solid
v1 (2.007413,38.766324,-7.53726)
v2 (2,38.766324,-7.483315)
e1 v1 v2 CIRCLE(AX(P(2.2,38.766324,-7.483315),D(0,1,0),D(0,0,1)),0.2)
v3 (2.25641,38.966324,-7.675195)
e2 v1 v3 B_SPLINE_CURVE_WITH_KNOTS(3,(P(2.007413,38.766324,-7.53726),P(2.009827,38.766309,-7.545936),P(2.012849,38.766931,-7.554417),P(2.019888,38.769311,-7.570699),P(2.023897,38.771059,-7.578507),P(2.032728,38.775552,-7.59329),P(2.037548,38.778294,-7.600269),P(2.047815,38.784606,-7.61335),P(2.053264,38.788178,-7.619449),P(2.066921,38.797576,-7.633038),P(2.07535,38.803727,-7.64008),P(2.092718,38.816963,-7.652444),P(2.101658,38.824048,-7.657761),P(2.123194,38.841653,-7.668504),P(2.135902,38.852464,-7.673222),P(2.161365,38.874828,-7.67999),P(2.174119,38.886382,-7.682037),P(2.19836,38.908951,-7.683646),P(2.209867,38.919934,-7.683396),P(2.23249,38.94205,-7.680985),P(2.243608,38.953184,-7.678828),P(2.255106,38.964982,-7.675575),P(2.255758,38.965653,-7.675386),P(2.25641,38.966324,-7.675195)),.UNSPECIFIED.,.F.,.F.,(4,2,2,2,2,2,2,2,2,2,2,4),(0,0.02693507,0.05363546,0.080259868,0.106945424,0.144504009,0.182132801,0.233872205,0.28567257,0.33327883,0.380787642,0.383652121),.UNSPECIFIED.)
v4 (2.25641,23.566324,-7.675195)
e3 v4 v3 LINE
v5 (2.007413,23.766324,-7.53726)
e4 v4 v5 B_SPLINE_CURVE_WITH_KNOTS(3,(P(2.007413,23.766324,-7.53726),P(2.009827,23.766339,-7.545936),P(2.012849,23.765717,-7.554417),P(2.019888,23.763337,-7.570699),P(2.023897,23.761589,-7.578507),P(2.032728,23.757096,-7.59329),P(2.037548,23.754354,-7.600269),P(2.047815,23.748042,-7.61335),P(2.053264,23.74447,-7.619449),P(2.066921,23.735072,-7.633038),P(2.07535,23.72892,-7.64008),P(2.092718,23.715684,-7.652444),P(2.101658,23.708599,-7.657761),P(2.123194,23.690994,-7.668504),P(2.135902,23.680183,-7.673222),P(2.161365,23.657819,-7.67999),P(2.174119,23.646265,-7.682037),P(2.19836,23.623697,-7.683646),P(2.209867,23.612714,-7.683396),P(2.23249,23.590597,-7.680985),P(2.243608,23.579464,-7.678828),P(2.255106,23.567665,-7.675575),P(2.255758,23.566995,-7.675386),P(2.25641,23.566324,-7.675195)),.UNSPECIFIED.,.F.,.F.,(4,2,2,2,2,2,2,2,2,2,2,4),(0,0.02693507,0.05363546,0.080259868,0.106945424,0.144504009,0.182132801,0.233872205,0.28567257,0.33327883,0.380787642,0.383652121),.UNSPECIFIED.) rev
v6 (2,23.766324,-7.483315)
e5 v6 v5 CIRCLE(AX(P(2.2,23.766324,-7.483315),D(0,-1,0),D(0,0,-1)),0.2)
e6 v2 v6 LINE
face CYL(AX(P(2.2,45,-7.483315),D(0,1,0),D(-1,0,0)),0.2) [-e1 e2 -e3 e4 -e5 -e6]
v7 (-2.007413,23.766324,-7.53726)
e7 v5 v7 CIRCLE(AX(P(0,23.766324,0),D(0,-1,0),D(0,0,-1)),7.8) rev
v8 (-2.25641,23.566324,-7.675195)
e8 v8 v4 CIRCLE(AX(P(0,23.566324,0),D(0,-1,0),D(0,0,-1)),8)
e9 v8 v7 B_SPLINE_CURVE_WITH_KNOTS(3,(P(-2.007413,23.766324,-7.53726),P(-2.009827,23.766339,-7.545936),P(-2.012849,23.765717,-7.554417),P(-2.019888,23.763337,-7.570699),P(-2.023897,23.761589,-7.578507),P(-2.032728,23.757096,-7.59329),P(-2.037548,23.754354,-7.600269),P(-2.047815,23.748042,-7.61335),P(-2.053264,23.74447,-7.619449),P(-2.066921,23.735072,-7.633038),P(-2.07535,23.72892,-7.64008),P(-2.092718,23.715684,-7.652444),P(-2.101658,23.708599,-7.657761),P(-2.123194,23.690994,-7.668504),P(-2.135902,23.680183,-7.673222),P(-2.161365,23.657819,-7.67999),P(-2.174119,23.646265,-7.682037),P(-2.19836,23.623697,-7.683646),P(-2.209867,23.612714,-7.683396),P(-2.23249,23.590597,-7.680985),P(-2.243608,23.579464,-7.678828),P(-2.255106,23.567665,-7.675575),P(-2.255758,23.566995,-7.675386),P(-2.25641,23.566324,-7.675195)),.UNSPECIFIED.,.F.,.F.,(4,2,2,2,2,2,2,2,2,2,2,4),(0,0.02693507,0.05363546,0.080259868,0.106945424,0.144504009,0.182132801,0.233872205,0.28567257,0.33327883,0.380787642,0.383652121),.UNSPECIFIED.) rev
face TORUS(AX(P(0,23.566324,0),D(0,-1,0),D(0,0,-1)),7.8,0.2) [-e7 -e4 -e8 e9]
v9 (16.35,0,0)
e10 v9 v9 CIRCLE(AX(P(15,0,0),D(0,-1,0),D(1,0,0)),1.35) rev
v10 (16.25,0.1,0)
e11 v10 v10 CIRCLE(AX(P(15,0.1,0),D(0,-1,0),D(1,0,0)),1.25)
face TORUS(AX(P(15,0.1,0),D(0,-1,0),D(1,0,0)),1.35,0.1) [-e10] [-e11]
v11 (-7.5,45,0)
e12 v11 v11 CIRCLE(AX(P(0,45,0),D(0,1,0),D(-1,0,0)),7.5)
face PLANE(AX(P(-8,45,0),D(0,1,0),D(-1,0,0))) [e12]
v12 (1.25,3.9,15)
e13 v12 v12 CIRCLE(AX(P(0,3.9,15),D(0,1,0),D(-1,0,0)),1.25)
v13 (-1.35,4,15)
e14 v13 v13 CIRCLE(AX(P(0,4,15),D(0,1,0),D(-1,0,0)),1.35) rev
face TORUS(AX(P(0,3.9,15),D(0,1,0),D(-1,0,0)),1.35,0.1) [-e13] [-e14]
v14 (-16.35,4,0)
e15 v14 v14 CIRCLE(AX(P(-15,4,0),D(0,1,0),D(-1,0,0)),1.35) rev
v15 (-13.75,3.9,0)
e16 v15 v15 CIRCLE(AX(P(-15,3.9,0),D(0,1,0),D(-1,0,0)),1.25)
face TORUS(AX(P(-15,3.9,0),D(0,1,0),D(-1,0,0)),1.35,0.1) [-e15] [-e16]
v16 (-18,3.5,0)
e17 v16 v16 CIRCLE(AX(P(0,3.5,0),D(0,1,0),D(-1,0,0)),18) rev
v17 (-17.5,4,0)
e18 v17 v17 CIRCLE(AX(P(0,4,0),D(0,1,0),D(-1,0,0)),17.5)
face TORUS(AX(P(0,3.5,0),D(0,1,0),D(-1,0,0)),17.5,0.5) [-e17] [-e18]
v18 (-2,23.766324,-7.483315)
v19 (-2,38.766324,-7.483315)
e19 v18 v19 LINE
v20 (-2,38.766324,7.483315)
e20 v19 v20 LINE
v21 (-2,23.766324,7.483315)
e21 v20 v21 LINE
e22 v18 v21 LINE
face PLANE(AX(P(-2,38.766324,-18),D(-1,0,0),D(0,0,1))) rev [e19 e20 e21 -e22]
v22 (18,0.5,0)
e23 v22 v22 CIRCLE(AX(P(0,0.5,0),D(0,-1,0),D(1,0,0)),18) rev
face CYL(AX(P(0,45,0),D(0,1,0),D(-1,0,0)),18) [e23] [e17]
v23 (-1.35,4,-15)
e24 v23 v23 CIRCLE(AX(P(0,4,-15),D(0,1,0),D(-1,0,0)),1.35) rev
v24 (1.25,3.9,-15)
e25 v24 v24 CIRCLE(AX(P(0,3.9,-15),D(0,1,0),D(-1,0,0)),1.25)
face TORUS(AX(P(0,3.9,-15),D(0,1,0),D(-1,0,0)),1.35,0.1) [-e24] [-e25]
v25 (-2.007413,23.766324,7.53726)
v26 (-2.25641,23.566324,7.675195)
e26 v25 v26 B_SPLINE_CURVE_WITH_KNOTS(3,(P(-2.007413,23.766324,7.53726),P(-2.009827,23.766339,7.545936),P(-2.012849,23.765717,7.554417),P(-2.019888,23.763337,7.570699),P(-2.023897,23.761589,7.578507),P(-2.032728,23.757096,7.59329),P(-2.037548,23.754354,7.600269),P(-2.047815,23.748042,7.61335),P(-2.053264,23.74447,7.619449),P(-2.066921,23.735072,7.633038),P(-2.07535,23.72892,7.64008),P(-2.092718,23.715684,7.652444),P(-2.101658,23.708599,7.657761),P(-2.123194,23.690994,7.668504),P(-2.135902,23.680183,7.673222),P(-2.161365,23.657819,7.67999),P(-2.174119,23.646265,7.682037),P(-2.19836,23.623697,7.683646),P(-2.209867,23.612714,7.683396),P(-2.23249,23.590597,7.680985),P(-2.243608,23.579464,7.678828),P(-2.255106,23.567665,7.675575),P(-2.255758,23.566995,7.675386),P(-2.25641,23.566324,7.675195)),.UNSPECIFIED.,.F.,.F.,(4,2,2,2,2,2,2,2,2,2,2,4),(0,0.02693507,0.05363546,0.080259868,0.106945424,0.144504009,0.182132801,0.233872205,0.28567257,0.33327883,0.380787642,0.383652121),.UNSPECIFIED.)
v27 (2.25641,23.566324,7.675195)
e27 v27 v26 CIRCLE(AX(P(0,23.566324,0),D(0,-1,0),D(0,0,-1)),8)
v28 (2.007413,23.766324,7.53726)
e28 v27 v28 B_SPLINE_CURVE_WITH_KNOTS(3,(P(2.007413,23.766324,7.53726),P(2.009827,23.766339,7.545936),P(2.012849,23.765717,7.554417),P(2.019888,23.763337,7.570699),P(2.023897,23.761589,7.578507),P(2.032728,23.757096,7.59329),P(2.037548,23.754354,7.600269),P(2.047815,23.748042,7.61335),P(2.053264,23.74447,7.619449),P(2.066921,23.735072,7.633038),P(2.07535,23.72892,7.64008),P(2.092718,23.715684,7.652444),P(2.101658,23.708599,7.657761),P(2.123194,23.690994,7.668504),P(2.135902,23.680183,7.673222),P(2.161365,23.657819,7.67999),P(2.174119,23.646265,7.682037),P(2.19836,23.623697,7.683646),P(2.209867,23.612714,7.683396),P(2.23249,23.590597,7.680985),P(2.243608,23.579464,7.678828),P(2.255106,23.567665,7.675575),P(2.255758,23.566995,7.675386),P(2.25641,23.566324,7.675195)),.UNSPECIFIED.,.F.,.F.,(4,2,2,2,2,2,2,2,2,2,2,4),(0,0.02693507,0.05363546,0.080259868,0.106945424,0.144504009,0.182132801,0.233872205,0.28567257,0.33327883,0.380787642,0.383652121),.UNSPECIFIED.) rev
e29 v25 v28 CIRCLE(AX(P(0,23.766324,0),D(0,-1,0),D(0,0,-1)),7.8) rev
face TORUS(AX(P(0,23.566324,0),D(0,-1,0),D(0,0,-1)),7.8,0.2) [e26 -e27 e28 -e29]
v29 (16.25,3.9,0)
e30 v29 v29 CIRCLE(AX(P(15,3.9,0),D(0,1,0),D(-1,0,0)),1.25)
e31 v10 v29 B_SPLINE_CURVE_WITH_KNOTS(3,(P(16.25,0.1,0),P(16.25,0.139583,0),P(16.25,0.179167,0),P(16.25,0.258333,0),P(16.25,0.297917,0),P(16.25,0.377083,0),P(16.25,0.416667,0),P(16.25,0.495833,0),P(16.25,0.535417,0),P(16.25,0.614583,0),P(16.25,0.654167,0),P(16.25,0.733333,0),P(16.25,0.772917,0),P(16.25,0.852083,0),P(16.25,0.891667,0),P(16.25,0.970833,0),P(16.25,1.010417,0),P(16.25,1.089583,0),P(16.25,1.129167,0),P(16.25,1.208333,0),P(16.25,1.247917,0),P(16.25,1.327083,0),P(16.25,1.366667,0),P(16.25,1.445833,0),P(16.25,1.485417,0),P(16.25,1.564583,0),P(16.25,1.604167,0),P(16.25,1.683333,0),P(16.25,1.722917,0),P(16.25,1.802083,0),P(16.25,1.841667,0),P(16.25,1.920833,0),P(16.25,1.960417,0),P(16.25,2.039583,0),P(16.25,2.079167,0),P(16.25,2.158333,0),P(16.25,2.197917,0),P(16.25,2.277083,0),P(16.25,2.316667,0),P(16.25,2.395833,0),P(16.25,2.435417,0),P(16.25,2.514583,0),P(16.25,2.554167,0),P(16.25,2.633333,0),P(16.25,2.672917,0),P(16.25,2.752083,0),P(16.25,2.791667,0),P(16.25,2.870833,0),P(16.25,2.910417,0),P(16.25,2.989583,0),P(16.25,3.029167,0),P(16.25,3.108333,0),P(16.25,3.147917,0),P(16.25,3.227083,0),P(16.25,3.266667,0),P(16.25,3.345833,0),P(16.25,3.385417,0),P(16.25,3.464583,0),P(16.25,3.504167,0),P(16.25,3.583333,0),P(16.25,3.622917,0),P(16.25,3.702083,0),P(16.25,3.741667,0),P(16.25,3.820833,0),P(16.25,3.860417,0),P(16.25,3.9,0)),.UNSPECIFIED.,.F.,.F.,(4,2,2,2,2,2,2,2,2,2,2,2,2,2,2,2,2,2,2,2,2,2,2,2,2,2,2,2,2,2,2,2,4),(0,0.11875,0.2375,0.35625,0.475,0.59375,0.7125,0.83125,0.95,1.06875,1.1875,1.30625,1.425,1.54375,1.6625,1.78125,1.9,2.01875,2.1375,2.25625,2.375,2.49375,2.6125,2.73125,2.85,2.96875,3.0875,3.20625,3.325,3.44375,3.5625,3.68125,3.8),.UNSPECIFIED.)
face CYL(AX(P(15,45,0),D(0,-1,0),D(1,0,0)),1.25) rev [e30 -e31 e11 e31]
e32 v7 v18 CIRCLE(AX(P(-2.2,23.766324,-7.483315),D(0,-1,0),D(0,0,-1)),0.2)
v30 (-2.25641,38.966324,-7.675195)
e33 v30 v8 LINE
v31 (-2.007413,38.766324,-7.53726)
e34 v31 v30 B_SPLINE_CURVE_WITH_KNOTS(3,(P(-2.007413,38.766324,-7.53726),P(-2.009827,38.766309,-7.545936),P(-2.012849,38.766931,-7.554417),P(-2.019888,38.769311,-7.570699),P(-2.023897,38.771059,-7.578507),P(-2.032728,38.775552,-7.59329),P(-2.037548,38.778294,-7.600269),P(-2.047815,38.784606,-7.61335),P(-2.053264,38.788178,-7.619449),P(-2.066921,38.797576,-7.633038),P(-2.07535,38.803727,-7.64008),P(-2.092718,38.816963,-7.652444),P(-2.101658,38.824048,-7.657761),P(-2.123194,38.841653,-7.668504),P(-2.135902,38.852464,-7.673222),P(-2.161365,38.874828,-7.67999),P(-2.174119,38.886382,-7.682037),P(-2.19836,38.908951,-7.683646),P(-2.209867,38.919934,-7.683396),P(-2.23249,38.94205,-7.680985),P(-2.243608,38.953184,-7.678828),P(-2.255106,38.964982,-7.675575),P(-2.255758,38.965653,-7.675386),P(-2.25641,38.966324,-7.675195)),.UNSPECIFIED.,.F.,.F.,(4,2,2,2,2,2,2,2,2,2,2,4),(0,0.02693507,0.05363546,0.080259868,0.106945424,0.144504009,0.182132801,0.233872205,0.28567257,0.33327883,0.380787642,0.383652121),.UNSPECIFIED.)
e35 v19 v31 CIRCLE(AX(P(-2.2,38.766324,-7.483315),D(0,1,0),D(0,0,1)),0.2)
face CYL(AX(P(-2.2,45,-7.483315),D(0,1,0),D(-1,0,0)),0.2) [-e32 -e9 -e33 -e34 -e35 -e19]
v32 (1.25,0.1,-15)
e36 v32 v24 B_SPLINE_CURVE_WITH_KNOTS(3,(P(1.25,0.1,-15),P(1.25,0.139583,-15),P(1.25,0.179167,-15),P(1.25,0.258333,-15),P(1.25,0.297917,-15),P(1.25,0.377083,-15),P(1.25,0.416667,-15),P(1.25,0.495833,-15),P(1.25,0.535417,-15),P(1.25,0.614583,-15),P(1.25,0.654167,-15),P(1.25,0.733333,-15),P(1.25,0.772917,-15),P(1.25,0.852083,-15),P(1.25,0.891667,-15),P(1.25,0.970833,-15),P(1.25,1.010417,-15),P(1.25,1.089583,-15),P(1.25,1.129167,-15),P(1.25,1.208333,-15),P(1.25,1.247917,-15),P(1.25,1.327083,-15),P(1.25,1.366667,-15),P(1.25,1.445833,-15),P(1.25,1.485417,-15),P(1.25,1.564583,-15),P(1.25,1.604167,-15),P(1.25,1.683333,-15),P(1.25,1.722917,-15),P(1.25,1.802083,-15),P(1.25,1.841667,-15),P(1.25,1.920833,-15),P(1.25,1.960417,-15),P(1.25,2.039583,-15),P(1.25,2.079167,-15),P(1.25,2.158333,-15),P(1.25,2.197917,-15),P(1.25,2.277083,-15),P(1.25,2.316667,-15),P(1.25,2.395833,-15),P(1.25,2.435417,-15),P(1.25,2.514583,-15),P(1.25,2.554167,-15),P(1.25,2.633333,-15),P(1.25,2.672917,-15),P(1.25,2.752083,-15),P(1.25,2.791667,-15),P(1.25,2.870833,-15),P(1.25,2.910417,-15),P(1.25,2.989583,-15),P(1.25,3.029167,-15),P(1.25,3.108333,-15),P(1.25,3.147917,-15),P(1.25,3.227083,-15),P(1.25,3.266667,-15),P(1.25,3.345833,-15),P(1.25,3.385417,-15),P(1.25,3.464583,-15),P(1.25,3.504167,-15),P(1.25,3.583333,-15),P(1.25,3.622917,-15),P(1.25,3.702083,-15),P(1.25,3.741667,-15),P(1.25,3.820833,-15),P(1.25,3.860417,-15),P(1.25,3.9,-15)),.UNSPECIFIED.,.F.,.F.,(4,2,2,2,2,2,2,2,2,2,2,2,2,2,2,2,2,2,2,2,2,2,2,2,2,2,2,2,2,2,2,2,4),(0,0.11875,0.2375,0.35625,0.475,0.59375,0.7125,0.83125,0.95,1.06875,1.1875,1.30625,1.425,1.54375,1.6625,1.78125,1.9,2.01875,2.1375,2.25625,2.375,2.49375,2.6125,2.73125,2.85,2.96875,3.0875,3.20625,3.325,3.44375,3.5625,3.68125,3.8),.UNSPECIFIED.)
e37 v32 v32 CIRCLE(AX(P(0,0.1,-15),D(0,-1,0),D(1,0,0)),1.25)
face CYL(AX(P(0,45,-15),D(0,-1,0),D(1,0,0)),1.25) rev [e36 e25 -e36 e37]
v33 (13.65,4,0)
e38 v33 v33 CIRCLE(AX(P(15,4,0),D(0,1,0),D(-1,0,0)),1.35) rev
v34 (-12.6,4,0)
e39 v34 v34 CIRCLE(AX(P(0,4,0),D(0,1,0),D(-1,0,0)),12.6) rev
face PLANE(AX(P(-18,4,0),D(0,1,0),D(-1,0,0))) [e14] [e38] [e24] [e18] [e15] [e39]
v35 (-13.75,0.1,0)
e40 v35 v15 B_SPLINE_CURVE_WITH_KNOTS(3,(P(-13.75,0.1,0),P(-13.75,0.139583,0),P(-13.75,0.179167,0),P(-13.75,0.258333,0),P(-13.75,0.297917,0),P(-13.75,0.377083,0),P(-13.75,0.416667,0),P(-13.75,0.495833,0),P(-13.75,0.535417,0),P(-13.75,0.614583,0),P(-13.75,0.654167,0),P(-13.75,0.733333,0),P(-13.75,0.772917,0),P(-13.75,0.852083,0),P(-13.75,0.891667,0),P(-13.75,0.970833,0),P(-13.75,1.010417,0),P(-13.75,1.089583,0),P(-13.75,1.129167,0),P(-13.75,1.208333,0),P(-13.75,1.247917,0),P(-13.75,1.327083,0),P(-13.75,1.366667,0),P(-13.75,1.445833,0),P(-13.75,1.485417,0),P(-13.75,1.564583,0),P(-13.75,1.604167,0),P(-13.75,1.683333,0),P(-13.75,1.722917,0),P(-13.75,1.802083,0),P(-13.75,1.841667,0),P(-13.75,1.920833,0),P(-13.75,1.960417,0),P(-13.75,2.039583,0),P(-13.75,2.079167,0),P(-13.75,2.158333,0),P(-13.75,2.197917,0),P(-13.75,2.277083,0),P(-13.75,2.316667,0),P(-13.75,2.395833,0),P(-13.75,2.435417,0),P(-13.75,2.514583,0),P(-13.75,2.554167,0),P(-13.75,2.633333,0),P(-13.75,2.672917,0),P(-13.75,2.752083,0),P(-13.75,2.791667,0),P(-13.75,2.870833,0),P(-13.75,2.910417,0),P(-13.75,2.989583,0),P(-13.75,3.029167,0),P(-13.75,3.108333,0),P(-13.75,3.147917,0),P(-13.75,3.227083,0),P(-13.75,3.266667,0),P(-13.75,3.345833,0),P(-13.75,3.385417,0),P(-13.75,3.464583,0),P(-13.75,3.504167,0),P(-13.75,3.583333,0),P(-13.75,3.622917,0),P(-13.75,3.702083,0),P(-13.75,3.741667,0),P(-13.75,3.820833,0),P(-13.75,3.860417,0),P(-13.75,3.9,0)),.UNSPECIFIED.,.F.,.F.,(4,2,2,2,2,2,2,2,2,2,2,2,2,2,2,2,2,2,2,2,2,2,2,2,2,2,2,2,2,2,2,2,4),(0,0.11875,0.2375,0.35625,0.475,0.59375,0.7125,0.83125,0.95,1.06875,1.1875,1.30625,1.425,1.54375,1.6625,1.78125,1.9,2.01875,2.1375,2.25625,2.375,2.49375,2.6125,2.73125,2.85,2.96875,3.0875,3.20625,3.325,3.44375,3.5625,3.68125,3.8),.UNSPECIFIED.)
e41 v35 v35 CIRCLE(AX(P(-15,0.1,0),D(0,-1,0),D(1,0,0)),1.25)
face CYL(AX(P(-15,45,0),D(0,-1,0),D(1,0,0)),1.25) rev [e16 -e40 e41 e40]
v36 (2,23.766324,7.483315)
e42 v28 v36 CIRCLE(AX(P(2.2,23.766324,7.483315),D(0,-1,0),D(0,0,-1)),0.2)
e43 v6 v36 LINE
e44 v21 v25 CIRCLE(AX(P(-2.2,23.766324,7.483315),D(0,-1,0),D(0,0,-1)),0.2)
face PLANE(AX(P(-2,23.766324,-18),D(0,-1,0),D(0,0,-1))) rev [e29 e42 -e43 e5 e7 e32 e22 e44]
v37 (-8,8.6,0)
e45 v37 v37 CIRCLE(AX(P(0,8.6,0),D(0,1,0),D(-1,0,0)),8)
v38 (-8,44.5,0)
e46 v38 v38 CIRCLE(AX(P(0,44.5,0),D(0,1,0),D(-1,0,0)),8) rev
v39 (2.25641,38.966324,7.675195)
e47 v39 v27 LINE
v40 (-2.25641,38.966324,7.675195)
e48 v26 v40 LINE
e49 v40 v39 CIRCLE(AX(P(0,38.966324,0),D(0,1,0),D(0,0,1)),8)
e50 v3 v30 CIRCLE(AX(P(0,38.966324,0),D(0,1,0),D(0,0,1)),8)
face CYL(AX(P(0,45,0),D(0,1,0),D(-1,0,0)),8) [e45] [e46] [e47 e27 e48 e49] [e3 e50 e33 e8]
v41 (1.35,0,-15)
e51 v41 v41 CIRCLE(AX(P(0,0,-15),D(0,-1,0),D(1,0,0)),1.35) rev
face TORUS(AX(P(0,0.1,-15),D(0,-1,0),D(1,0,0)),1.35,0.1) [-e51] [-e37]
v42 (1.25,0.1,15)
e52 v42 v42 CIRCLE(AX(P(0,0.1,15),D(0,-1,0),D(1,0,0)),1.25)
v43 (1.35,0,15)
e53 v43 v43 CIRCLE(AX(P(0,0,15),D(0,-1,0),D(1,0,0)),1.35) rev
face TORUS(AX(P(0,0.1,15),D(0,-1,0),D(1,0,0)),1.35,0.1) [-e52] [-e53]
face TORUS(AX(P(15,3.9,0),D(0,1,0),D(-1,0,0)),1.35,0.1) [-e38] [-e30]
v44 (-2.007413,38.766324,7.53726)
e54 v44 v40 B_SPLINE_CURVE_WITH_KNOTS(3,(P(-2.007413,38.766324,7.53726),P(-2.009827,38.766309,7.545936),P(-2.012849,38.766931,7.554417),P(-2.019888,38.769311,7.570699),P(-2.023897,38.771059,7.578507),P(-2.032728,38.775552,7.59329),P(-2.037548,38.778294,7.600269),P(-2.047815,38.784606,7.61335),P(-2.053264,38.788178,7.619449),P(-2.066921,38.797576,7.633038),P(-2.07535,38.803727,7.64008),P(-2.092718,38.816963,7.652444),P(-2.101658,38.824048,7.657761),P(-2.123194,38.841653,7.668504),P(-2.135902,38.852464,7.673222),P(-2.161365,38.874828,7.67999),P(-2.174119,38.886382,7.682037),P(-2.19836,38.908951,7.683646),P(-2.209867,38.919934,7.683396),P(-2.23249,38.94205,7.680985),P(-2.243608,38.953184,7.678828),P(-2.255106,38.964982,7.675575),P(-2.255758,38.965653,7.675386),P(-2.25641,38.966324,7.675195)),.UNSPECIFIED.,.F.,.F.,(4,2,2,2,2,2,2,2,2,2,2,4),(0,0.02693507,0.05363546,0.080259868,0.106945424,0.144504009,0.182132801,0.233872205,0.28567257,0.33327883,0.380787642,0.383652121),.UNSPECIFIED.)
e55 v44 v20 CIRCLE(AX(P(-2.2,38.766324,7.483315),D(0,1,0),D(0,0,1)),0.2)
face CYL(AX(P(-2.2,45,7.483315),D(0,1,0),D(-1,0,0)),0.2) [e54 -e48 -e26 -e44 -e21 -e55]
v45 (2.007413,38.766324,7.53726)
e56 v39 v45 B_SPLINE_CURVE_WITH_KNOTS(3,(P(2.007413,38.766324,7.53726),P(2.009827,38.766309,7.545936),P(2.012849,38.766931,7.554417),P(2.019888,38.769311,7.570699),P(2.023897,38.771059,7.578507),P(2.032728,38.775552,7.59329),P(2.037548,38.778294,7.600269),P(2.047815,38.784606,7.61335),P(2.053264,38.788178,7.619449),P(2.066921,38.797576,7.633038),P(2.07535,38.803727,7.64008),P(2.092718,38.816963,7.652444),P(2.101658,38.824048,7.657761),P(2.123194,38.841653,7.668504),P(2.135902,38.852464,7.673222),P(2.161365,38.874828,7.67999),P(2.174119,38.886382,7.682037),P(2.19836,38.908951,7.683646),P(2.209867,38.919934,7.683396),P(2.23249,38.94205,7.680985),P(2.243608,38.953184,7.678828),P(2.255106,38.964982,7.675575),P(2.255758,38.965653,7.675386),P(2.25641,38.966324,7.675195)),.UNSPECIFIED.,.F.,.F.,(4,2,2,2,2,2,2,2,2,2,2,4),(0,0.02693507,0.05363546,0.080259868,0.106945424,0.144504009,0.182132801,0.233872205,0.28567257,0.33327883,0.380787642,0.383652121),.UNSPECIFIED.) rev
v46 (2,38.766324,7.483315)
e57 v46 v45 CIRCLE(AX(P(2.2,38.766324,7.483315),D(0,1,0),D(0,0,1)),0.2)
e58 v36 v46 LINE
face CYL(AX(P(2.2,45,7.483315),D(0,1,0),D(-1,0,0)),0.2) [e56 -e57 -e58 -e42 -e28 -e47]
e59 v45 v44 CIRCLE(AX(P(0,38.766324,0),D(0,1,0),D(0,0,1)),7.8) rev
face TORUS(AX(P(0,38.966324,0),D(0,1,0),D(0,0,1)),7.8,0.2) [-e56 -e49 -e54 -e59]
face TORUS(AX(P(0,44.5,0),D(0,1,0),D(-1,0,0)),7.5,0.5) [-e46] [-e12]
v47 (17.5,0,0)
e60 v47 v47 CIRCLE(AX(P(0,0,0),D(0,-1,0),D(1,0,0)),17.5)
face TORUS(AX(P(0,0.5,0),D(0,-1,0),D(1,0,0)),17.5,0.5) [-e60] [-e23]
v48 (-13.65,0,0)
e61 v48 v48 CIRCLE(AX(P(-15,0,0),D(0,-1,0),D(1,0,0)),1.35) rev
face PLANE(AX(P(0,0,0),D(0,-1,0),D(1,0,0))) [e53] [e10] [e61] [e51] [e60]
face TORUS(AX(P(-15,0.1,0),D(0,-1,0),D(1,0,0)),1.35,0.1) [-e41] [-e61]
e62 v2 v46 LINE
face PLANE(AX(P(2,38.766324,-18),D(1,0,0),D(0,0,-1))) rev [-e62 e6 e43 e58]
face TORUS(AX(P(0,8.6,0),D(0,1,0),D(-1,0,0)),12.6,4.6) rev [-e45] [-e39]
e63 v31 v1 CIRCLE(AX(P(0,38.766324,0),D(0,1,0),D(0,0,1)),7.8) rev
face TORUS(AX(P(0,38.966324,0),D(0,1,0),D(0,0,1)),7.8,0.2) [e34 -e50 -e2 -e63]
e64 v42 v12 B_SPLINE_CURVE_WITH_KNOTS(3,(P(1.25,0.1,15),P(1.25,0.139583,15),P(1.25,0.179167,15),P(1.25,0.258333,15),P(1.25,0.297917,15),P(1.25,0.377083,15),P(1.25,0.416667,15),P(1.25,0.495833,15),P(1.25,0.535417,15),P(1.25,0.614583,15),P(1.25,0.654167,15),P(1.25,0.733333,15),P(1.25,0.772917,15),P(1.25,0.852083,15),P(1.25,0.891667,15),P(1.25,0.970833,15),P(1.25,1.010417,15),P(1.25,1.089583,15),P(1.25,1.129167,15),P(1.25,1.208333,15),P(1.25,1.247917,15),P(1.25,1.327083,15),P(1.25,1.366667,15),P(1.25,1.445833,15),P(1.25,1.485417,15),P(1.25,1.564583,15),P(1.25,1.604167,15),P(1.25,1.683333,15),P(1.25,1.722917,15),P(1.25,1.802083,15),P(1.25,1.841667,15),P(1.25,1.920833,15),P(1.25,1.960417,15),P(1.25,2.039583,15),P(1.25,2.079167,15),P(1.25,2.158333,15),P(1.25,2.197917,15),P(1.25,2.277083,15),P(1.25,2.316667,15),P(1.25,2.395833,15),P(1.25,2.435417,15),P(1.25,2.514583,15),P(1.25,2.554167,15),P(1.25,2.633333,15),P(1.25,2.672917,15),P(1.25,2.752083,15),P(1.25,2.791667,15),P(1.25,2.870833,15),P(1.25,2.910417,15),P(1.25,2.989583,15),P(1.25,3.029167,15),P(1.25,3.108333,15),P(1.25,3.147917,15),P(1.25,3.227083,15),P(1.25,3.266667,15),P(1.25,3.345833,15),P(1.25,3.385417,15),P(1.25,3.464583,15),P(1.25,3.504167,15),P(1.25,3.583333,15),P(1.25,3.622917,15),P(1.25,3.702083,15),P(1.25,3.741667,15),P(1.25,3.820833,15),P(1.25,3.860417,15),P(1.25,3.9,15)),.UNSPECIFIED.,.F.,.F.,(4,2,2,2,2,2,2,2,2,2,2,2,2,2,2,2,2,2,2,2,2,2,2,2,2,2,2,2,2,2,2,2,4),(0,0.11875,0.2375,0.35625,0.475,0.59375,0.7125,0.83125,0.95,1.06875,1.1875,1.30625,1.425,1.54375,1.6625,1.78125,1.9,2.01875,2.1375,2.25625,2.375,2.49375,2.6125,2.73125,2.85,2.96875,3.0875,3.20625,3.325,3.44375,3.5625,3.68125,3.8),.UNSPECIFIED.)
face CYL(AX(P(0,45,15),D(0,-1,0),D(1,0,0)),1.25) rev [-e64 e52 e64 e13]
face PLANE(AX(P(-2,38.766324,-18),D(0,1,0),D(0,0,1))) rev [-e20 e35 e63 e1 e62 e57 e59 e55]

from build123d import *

# Parameters (mm, degrees)
SKETCH_3_R               = 1.25
CUT_EXTRUDE_1_DEPTH      = 52.701063819
FILLET_3_R               = 0.5
FILLET_4_R               = 4.6
FILLET_6_R               = 0.1
FILLET_7_R               = 0.1
CUT_EXTRUDE_3_DEPTH      = 52.701063888
CUT_EXTRUDE_3_DEPTH_BACK = 52.701063888
SKETCH_5_W               = 4
SKETCH_5_H               = 15
FILLET_10_R              = 0.2
FILLET_11_R              = 0.2


with BuildPart() as part:
    # ｽｹｯﾁ1 → 回転1 (revolve)
    with BuildSketch(Plane.XY):
        Polygon((0, 0), (-18, 0), (-18, 4), (-8, 4), (-8, 45), (0, 45), align=None)
    revolve(axis=Axis((0, 45, 0), (0, -1, 0)))

    # ｽｹｯﾁ3 → ｶｯﾄ - 押し出し1 (cut, through all)
    with BuildSketch(Plane.XZ):
        with Locations((0, 15)):
            Circle(SKETCH_3_R)
        with Locations((15, 0)):
            Circle(SKETCH_3_R)
        with Locations((0, -15)):
            Circle(SKETCH_3_R)
        with Locations((-15, 0)):
            Circle(SKETCH_3_R)
    extrude(amount=-CUT_EXTRUDE_1_DEPTH, mode=Mode.SUBTRACT)

    # ﾌｨﾚｯﾄ3
    fillet_3_edges = [part.edges().sort_by_distance(p)[0] for p in [
        (8, 45, 0),
        (18, 4, 0),
        (18, 0, 0),
    ]]
    fillet(fillet_3_edges, radius=FILLET_3_R)

    # ﾌｨﾚｯﾄ4
    fillet_4_edges = [part.edges().sort_by_distance(p)[0] for p in [
        (8, 4, 0),
    ]]
    fillet(fillet_4_edges, radius=FILLET_4_R)

    # ﾌｨﾚｯﾄ6
    fillet_6_edges = [part.edges().sort_by_distance(p)[0] for p in [
        (-1.25, 4, 15),
        (13.75, 4, 0),
        (-1.25, 4, -15),
        (-16.25, 4, 0),
    ]]
    fillet(fillet_6_edges, radius=FILLET_6_R)

    # ﾌｨﾚｯﾄ7
    fillet_7_edges = [part.edges().sort_by_distance(p)[0] for p in [
        (-1.25, 0, 15),
        (13.75, 0, 0),
        (-1.25, 0, -15),
        (-16.25, 0, 0),
    ]]
    fillet(fillet_7_edges, radius=FILLET_7_R)

    # ｽｹｯﾁ5 → ｶｯﾄ - 押し出し3 (cut, two sides: drawn at the far end of the back side and taken through both)
    with BuildSketch(Plane.XY.offset(-CUT_EXTRUDE_3_DEPTH_BACK)):
        with Locations((0, 31.266323704)):
            Rectangle(SKETCH_5_W, SKETCH_5_H)
    extrude(amount=CUT_EXTRUDE_3_DEPTH + CUT_EXTRUDE_3_DEPTH_BACK, mode=Mode.SUBTRACT)

    # ﾌｨﾚｯﾄ10
    # the kernel refuses this fillet: 0.2 mm, written as the material it takes off along each edge
    with BuildSketch(Plane(origin=(0, 23.766323704, 0), x_dir=(-0.30999032218049516, 0, 0.9507397120949733), z_dir=(-0.9507397120949733, 0, -0.30999032218049516))) as fillet_10_piece_1_section:
        with BuildLine():
            CenterArc((8 - FILLET_10_R, -FILLET_10_R), FILLET_10_R, 0, 90)
            Line((8 - FILLET_10_R, 0), (8, 0))
            Line((8, 0), (8, -FILLET_10_R))
        make_face()
    fillet_10_piece_1 = revolve(axis=Axis((0, 23.766323704, 0), (0, 1, 0)), revolution_arc=36.117294523, mode=Mode.PRIVATE)
    fillet_10_piece_1 = split(fillet_10_piece_1, bisect_by=Plane(origin=(-2, 23.71018812, 7.943864416), z_dir=(1, 0, 0)), keep=Keep.TOP, mode=Mode.PRIVATE)
    fillet_10_piece_1 = split(fillet_10_piece_1, bisect_by=Plane(origin=(2, 23.71018812, 7.943864416), z_dir=(-1, 0, 0)), keep=Keep.TOP, mode=Mode.PRIVATE)
    add(fillet_10_piece_1, mode=Mode.SUBTRACT)
    with BuildSketch(Plane(origin=(2, 23.766323704, 7.745966692), x_dir=(0.9639558045611313, 0, -0.2660624115746191), z_dir=(0, 1, 0))) as fillet_10_piece_2:
        with BuildLine():
            CenterArc((0.262672964, 0.199972359), FILLET_10_R, 164.56990898, 106.382669854)
            Line((0.069881803, 0.253184842), (0, 0))
            ThreePointArc((0, 0), (0.132998969, -0.001105622), (0.265997938, 0))
        make_face()
    extrude(amount=15, mode=Mode.SUBTRACT)
    with BuildSketch(Plane(origin=(0, 38.766323704, 0), x_dir=(-0.3099903221804958, 0, 0.9507397120949732), z_dir=(-0.9507397120949732, 0, -0.3099903221804958))) as fillet_10_piece_3_section:
        with BuildLine():
            CenterArc((8 - FILLET_10_R, FILLET_10_R), FILLET_10_R, 270, 90)
            Line((8 - FILLET_10_R, 0), (8, 0))
            Line((8, 0), (8, FILLET_10_R))
        make_face()
    fillet_10_piece_3 = revolve(axis=Axis((0, 38.766323704, 0), (0, 1, 0)), revolution_arc=36.117294523, mode=Mode.PRIVATE)
    fillet_10_piece_3 = split(fillet_10_piece_3, bisect_by=Plane(origin=(-2, 38.822459288, 7.943864416), z_dir=(1, 0, 0)), keep=Keep.TOP, mode=Mode.PRIVATE)
    fillet_10_piece_3 = split(fillet_10_piece_3, bisect_by=Plane(origin=(2, 38.822459288, 7.943864416), z_dir=(-1, 0, 0)), keep=Keep.TOP, mode=Mode.PRIVATE)
    add(fillet_10_piece_3, mode=Mode.SUBTRACT)
    with BuildSketch(Plane(origin=(-2, 23.766323704, 7.745966692), x_dir=(-0.9639558045611314, 0, -0.26606241157461874), z_dir=(0, 1, 0))) as fillet_10_piece_4:
        with BuildLine():
            CenterArc((0.262672964, -0.199972359), FILLET_10_R, 89.047421166, 106.382669854)
            Line((0.069881803, -0.253184842), (0, 0))
            ThreePointArc((0, 0), (0.132998969, 0.001105622), (0.265997938, 0))
        make_face()
    extrude(amount=15, mode=Mode.SUBTRACT)
    with BuildSketch(Plane(origin=(0, 23.766323704, 0), x_dir=(-0.30999032218049516, 0, 0.9507397120949733), z_dir=(-0.9507397120949733, 0, -0.30999032218049516))) as fillet_10_piece_5a_section:
        with BuildLine():
            CenterArc((8 - FILLET_10_R, -FILLET_10_R), FILLET_10_R, 0, 90)
            Line((8 - FILLET_10_R, 0), (8, 0))
            Line((8, 0), (8, -FILLET_10_R))
        make_face()
    fillet_10_piece_5a = revolve(axis=Axis((0, 23.766323704, 0), (0, 1, 0)), revolution_arc=36.117294523, mode=Mode.PRIVATE)
    fillet_10_piece_5a = split(fillet_10_piece_5a, bisect_by=Plane(origin=(-2, 23.720318968, 7.634620405), z_dir=(-1, 0, 0)), keep=Keep.TOP, mode=Mode.PRIVATE)
    with BuildSketch(Plane(origin=(-2, 23.101328859, 7.745966692), x_dir=(-0.9639558045611316, 0, -0.26606241157461835), z_dir=(0, 1, 0))) as fillet_10_piece_5b_section:
        with BuildLine():
            CenterArc((0.262672964, -0.199972359), FILLET_10_R, 89.047421166, 106.382669854)
            Line((0.069881803, -0.253184842), (0, 0))
            ThreePointArc((0, 0), (0.132998969, 0.001105622), (0.265997938, 0))
        make_face()
    fillet_10_piece_5b = extrude(amount=15.664994845, mode=Mode.PRIVATE)
    fillet_10_piece_5b = split(fillet_10_piece_5b, bisect_by=Plane(origin=(-2.06034874, 23.766323704, 7.668384539), z_dir=(0, -1, 0)), keep=Keep.TOP, mode=Mode.PRIVATE)
    fillet_10_piece_5 = fillet_10_piece_5a & fillet_10_piece_5b
    add(fillet_10_piece_5, mode=Mode.SUBTRACT)
    with BuildSketch(Plane(origin=(2, 23.101328859, 7.745966692), x_dir=(0.9639558045611314, 0, -0.26606241157461874), z_dir=(0, 1, 0))) as fillet_10_piece_6a_section:
        with BuildLine():
            CenterArc((0.262672964, 0.199972359), FILLET_10_R, 164.56990898, 106.382669854)
            Line((0.069881803, 0.253184842), (0, 0))
            ThreePointArc((0, 0), (0.132998969, -0.001105622), (0.265997938, 0))
        make_face()
    fillet_10_piece_6a = extrude(amount=15.664994845, mode=Mode.PRIVATE)
    fillet_10_piece_6a = split(fillet_10_piece_6a, bisect_by=Plane(origin=(2.06034874, 23.766323704, 7.668384539), z_dir=(0, -1, 0)), keep=Keep.TOP, mode=Mode.PRIVATE)
    with BuildSketch(Plane(origin=(0, 23.766323704, 0), x_dir=(-0.30999032218049516, 0, 0.9507397120949733), z_dir=(-0.9507397120949733, 0, -0.30999032218049516))) as fillet_10_piece_6b_section:
        with BuildLine():
            CenterArc((8 - FILLET_10_R, -FILLET_10_R), FILLET_10_R, 0, 90)
            Line((8 - FILLET_10_R, 0), (8, 0))
            Line((8, 0), (8, -FILLET_10_R))
        make_face()
    fillet_10_piece_6b = revolve(axis=Axis((0, 23.766323704, 0), (0, 1, 0)), revolution_arc=36.117294523, mode=Mode.PRIVATE)
    fillet_10_piece_6b = split(fillet_10_piece_6b, bisect_by=Plane(origin=(2, 23.72031891, 7.634620664), z_dir=(1, 0, 0)), keep=Keep.TOP, mode=Mode.PRIVATE)
    fillet_10_piece_6 = fillet_10_piece_6a & fillet_10_piece_6b
    add(fillet_10_piece_6, mode=Mode.SUBTRACT)
    with BuildSketch(Plane(origin=(0, 38.766323704, 0), x_dir=(-0.3099903221804958, 0, 0.9507397120949732), z_dir=(-0.9507397120949732, 0, -0.3099903221804958))) as fillet_10_piece_7a_section:
        with BuildLine():
            CenterArc((8 - FILLET_10_R, FILLET_10_R), FILLET_10_R, 270, 90)
            Line((8 - FILLET_10_R, 0), (8, 0))
            Line((8, 0), (8, FILLET_10_R))
        make_face()
    fillet_10_piece_7a = revolve(axis=Axis((0, 38.766323704, 0), (0, 1, 0)), revolution_arc=36.117294523, mode=Mode.PRIVATE)
    fillet_10_piece_7a = split(fillet_10_piece_7a, bisect_by=Plane(origin=(2, 38.812328495, 7.634620662), z_dir=(1, 0, 0)), keep=Keep.TOP, mode=Mode.PRIVATE)
    with BuildSketch(Plane(origin=(2, 23.766323704, 7.745966692), x_dir=(0.9639558045611313, 0, -0.2660624115746191), z_dir=(0, 1, 0))) as fillet_10_piece_7b_section:
        with BuildLine():
            CenterArc((0.262672964, 0.199972359), FILLET_10_R, 164.56990898, 106.382669854)
            Line((0.069881803, 0.253184842), (0, 0))
            ThreePointArc((0, 0), (0.132998969, -0.001105622), (0.265997938, 0))
        make_face()
    fillet_10_piece_7b = extrude(amount=15.664994845, mode=Mode.PRIVATE)
    fillet_10_piece_7b = split(fillet_10_piece_7b, bisect_by=Plane(origin=(2.06034874, 38.766323704, 7.668384539), z_dir=(0, 1, 0)), keep=Keep.TOP, mode=Mode.PRIVATE)
    fillet_10_piece_7 = fillet_10_piece_7a & fillet_10_piece_7b
    add(fillet_10_piece_7, mode=Mode.SUBTRACT)
    with BuildSketch(Plane(origin=(0, 38.766323704, 0), x_dir=(-0.3099903221804958, 0, 0.9507397120949732), z_dir=(-0.9507397120949732, 0, -0.3099903221804958))) as fillet_10_piece_8a_section:
        with BuildLine():
            CenterArc((8 - FILLET_10_R, FILLET_10_R), FILLET_10_R, 270, 90)
            Line((8 - FILLET_10_R, 0), (8, 0))
            Line((8, 0), (8, FILLET_10_R))
        make_face()
    fillet_10_piece_8a = revolve(axis=Axis((0, 38.766323704, 0), (0, 1, 0)), revolution_arc=36.117294523, mode=Mode.PRIVATE)
    fillet_10_piece_8a = split(fillet_10_piece_8a, bisect_by=Plane(origin=(-2, 38.812328443, 7.634620407), z_dir=(-1, 0, 0)), keep=Keep.TOP, mode=Mode.PRIVATE)
    with BuildSketch(Plane(origin=(-2, 23.766323704, 7.745966692), x_dir=(-0.9639558045611314, 0, -0.26606241157461874), z_dir=(0, 1, 0))) as fillet_10_piece_8b_section:
        with BuildLine():
            CenterArc((0.262672964, -0.199972359), FILLET_10_R, 89.047421166, 106.382669854)
            Line((0.069881803, -0.253184842), (0, 0))
            ThreePointArc((0, 0), (0.132998969, 0.001105622), (0.265997938, 0))
        make_face()
    fillet_10_piece_8b = extrude(amount=15.664994845, mode=Mode.PRIVATE)
    fillet_10_piece_8b = split(fillet_10_piece_8b, bisect_by=Plane(origin=(-2.06034874, 38.766323704, 7.668384539), z_dir=(0, 1, 0)), keep=Keep.TOP, mode=Mode.PRIVATE)
    fillet_10_piece_8 = fillet_10_piece_8a & fillet_10_piece_8b
    add(fillet_10_piece_8, mode=Mode.SUBTRACT)

    # ﾌｨﾚｯﾄ11
    # the kernel refuses this fillet: 0.2 mm, written as the material it takes off along each edge
    with BuildSketch(Plane(origin=(0, 23.766323704, 0), x_dir=(0.30999032218049505, 0, -0.9507397120949734), z_dir=(0.9507397120949734, 0, 0.30999032218049505))) as fillet_11_piece_1_section:
        with BuildLine():
            CenterArc((8 - FILLET_11_R, -FILLET_11_R), FILLET_11_R, 0, 90)
            Line((8 - FILLET_11_R, 0), (8, 0))
            Line((8, 0), (8, -FILLET_11_R))
        make_face()
    fillet_11_piece_1 = revolve(axis=Axis((0, 23.766323704, 0), (0, 1, 0)), revolution_arc=36.117294523, mode=Mode.PRIVATE)
    fillet_11_piece_1 = split(fillet_11_piece_1, bisect_by=Plane(origin=(-2, 23.71018812, -7.943864416), z_dir=(1, 0, 0)), keep=Keep.TOP, mode=Mode.PRIVATE)
    fillet_11_piece_1 = split(fillet_11_piece_1, bisect_by=Plane(origin=(2, 23.71018812, -7.943864416), z_dir=(-1, 0, 0)), keep=Keep.TOP, mode=Mode.PRIVATE)
    add(fillet_11_piece_1, mode=Mode.SUBTRACT)
    with BuildSketch(Plane(origin=(2, 23.766323704, -7.745966692), x_dir=(0.9639558045611308, 0, 0.2660624115746208), z_dir=(0, 1, 0))) as fillet_11_piece_2:
        with BuildLine():
            CenterArc((0.262672964, -0.199972359), FILLET_11_R, 89.047421166, 106.382669854)
            Line((0.069881803, -0.253184842), (0, 0))
            ThreePointArc((0, 0), (0.132998969, 0.001105622), (0.265997938, 0))
        make_face()
    extrude(amount=15, mode=Mode.SUBTRACT)
    with BuildSketch(Plane(origin=(0, 38.766323704, 0), x_dir=(0.30999032218049594, 0, -0.9507397120949731), z_dir=(0.9507397120949731, 0, 0.30999032218049594))) as fillet_11_piece_3_section:
        with BuildLine():
            CenterArc((8 - FILLET_11_R, FILLET_11_R), FILLET_11_R, 270, 90)
            Line((8 - FILLET_11_R, 0), (8, 0))
            Line((8, 0), (8, FILLET_11_R))
        make_face()
    fillet_11_piece_3 = revolve(axis=Axis((0, 38.766323704, 0), (0, 1, 0)), revolution_arc=36.117294523, mode=Mode.PRIVATE)
    fillet_11_piece_3 = split(fillet_11_piece_3, bisect_by=Plane(origin=(-2, 38.822459288, -7.943864416), z_dir=(1, 0, 0)), keep=Keep.TOP, mode=Mode.PRIVATE)
    fillet_11_piece_3 = split(fillet_11_piece_3, bisect_by=Plane(origin=(2, 38.822459288, -7.943864416), z_dir=(-1, 0, 0)), keep=Keep.TOP, mode=Mode.PRIVATE)
    add(fillet_11_piece_3, mode=Mode.SUBTRACT)
    with BuildSketch(Plane(origin=(-2, 23.766323704, -7.745966692), x_dir=(-0.963955804561131, 0, 0.26606241157462), z_dir=(0, 1, 0))) as fillet_11_piece_4:
        with BuildLine():
            CenterArc((0.262672964, 0.199972359), FILLET_11_R, 164.56990898, 106.382669854)
            Line((0.069881803, 0.253184842), (0, 0))
            ThreePointArc((0, 0), (0.132998969, -0.001105622), (0.265997938, 0))
        make_face()
    extrude(amount=15, mode=Mode.SUBTRACT)
    with BuildSketch(Plane(origin=(2, 23.101328859, -7.745966692), x_dir=(0.9639558045611316, 0, 0.2660624115746186), z_dir=(0, 1, 0))) as fillet_11_piece_5a_section:
        with BuildLine():
            CenterArc((0.262672964, -0.199972359), FILLET_11_R, 89.047421166, 106.382669854)
            Line((0.069881803, -0.253184842), (0, 0))
            ThreePointArc((0, 0), (0.132998969, 0.001105622), (0.265997938, 0))
        make_face()
    fillet_11_piece_5a = extrude(amount=15.664994845, mode=Mode.PRIVATE)
    fillet_11_piece_5a = split(fillet_11_piece_5a, bisect_by=Plane(origin=(2.06034874, 23.766323704, -7.668384539), z_dir=(0, -1, 0)), keep=Keep.TOP, mode=Mode.PRIVATE)
    with BuildSketch(Plane(origin=(0, 23.766323704, 0), x_dir=(0.30999032218049505, 0, -0.9507397120949734), z_dir=(0.9507397120949734, 0, 0.30999032218049505))) as fillet_11_piece_5b_section:
        with BuildLine():
            CenterArc((8 - FILLET_11_R, -FILLET_11_R), FILLET_11_R, 0, 90)
            Line((8 - FILLET_11_R, 0), (8, 0))
            Line((8, 0), (8, -FILLET_11_R))
        make_face()
    fillet_11_piece_5b = revolve(axis=Axis((0, 23.766323704, 0), (0, 1, 0)), revolution_arc=36.117294523, mode=Mode.PRIVATE)
    fillet_11_piece_5b = split(fillet_11_piece_5b, bisect_by=Plane(origin=(2, 23.720318965, -7.634620407), z_dir=(1, 0, 0)), keep=Keep.TOP, mode=Mode.PRIVATE)
    fillet_11_piece_5 = fillet_11_piece_5a & fillet_11_piece_5b
    add(fillet_11_piece_5, mode=Mode.SUBTRACT)
    with BuildSketch(Plane(origin=(0, 23.766323704, 0), x_dir=(0.30999032218049505, 0, -0.9507397120949734), z_dir=(0.9507397120949734, 0, 0.30999032218049505))) as fillet_11_piece_6a_section:
        with BuildLine():
            CenterArc((8 - FILLET_11_R, -FILLET_11_R), FILLET_11_R, 0, 90)
            Line((8 - FILLET_11_R, 0), (8, 0))
            Line((8, 0), (8, -FILLET_11_R))
        make_face()
    fillet_11_piece_6a = revolve(axis=Axis((0, 23.766323704, 0), (0, 1, 0)), revolution_arc=36.117294523, mode=Mode.PRIVATE)
    fillet_11_piece_6a = split(fillet_11_piece_6a, bisect_by=Plane(origin=(-2, 23.720318913, -7.634620662), z_dir=(-1, 0, 0)), keep=Keep.TOP, mode=Mode.PRIVATE)
    with BuildSketch(Plane(origin=(-2, 23.101328859, -7.745966692), x_dir=(-0.9639558045611316, 0, 0.2660624115746186), z_dir=(0, 1, 0))) as fillet_11_piece_6b_section:
        with BuildLine():
            CenterArc((0.262672964, 0.199972359), FILLET_11_R, 164.56990898, 106.382669854)
            Line((0.069881803, 0.253184842), (0, 0))
            ThreePointArc((0, 0), (0.132998969, -0.001105622), (0.265997938, 0))
        make_face()
    fillet_11_piece_6b = extrude(amount=15.664994845, mode=Mode.PRIVATE)
    fillet_11_piece_6b = split(fillet_11_piece_6b, bisect_by=Plane(origin=(-2.06034874, 23.766323704, -7.668384539), z_dir=(0, -1, 0)), keep=Keep.TOP, mode=Mode.PRIVATE)
    fillet_11_piece_6 = fillet_11_piece_6a & fillet_11_piece_6b
    add(fillet_11_piece_6, mode=Mode.SUBTRACT)
    with BuildSketch(Plane(origin=(0, 38.766323704, 0), x_dir=(0.30999032218049594, 0, -0.9507397120949731), z_dir=(0.9507397120949731, 0, 0.30999032218049594))) as fillet_11_piece_7a_section:
        with BuildLine():
            CenterArc((8 - FILLET_11_R, FILLET_11_R), FILLET_11_R, 270, 90)
            Line((8 - FILLET_11_R, 0), (8, 0))
            Line((8, 0), (8, FILLET_11_R))
        make_face()
    fillet_11_piece_7a = revolve(axis=Axis((0, 38.766323704, 0), (0, 1, 0)), revolution_arc=36.117294523, mode=Mode.PRIVATE)
    fillet_11_piece_7a = split(fillet_11_piece_7a, bisect_by=Plane(origin=(2, 38.81232844, -7.634620405), z_dir=(1, 0, 0)), keep=Keep.TOP, mode=Mode.PRIVATE)
    with BuildSketch(Plane(origin=(2, 23.766323704, -7.745966692), x_dir=(0.9639558045611308, 0, 0.2660624115746208), z_dir=(0, 1, 0))) as fillet_11_piece_7b_section:
        with BuildLine():
            CenterArc((0.262672964, -0.199972359), FILLET_11_R, 89.047421166, 106.382669854)
            Line((0.069881803, -0.253184842), (0, 0))
            ThreePointArc((0, 0), (0.132998969, 0.001105622), (0.265997938, 0))
        make_face()
    fillet_11_piece_7b = extrude(amount=15.664994845, mode=Mode.PRIVATE)
    fillet_11_piece_7b = split(fillet_11_piece_7b, bisect_by=Plane(origin=(2.06034874, 38.766323704, -7.668384539), z_dir=(0, 1, 0)), keep=Keep.TOP, mode=Mode.PRIVATE)
    fillet_11_piece_7 = fillet_11_piece_7a & fillet_11_piece_7b
    add(fillet_11_piece_7, mode=Mode.SUBTRACT)
    with BuildSketch(Plane(origin=(0, 38.766323704, 0), x_dir=(0.30999032218049594, 0, -0.9507397120949731), z_dir=(0.9507397120949731, 0, 0.30999032218049594))) as fillet_11_piece_8a_section:
        with BuildLine():
            CenterArc((8 - FILLET_11_R, FILLET_11_R), FILLET_11_R, 270, 90)
            Line((8 - FILLET_11_R, 0), (8, 0))
            Line((8, 0), (8, FILLET_11_R))
        make_face()
    fillet_11_piece_8a = revolve(axis=Axis((0, 38.766323704, 0), (0, 1, 0)), revolution_arc=36.117294523, mode=Mode.PRIVATE)
    fillet_11_piece_8a = split(fillet_11_piece_8a, bisect_by=Plane(origin=(-2, 38.812328498, -7.634620664), z_dir=(-1, 0, 0)), keep=Keep.TOP, mode=Mode.PRIVATE)
    with BuildSketch(Plane(origin=(-2, 23.766323704, -7.745966692), x_dir=(-0.963955804561131, 0, 0.26606241157462), z_dir=(0, 1, 0))) as fillet_11_piece_8b_section:
        with BuildLine():
            CenterArc((0.262672964, 0.199972359), FILLET_11_R, 164.56990898, 106.382669854)
            Line((0.069881803, 0.253184842), (0, 0))
            ThreePointArc((0, 0), (0.132998969, -0.001105622), (0.265997938, 0))
        make_face()
    fillet_11_piece_8b = extrude(amount=15.664994845, mode=Mode.PRIVATE)
    fillet_11_piece_8b = split(fillet_11_piece_8b, bisect_by=Plane(origin=(-2.06034874, 38.766323704, -7.668384539), z_dir=(0, 1, 0)), keep=Keep.TOP, mode=Mode.PRIVATE)
    fillet_11_piece_8 = fillet_11_piece_8a & fillet_11_piece_8b
    add(fillet_11_piece_8, mode=Mode.SUBTRACT)


solid = part.part
